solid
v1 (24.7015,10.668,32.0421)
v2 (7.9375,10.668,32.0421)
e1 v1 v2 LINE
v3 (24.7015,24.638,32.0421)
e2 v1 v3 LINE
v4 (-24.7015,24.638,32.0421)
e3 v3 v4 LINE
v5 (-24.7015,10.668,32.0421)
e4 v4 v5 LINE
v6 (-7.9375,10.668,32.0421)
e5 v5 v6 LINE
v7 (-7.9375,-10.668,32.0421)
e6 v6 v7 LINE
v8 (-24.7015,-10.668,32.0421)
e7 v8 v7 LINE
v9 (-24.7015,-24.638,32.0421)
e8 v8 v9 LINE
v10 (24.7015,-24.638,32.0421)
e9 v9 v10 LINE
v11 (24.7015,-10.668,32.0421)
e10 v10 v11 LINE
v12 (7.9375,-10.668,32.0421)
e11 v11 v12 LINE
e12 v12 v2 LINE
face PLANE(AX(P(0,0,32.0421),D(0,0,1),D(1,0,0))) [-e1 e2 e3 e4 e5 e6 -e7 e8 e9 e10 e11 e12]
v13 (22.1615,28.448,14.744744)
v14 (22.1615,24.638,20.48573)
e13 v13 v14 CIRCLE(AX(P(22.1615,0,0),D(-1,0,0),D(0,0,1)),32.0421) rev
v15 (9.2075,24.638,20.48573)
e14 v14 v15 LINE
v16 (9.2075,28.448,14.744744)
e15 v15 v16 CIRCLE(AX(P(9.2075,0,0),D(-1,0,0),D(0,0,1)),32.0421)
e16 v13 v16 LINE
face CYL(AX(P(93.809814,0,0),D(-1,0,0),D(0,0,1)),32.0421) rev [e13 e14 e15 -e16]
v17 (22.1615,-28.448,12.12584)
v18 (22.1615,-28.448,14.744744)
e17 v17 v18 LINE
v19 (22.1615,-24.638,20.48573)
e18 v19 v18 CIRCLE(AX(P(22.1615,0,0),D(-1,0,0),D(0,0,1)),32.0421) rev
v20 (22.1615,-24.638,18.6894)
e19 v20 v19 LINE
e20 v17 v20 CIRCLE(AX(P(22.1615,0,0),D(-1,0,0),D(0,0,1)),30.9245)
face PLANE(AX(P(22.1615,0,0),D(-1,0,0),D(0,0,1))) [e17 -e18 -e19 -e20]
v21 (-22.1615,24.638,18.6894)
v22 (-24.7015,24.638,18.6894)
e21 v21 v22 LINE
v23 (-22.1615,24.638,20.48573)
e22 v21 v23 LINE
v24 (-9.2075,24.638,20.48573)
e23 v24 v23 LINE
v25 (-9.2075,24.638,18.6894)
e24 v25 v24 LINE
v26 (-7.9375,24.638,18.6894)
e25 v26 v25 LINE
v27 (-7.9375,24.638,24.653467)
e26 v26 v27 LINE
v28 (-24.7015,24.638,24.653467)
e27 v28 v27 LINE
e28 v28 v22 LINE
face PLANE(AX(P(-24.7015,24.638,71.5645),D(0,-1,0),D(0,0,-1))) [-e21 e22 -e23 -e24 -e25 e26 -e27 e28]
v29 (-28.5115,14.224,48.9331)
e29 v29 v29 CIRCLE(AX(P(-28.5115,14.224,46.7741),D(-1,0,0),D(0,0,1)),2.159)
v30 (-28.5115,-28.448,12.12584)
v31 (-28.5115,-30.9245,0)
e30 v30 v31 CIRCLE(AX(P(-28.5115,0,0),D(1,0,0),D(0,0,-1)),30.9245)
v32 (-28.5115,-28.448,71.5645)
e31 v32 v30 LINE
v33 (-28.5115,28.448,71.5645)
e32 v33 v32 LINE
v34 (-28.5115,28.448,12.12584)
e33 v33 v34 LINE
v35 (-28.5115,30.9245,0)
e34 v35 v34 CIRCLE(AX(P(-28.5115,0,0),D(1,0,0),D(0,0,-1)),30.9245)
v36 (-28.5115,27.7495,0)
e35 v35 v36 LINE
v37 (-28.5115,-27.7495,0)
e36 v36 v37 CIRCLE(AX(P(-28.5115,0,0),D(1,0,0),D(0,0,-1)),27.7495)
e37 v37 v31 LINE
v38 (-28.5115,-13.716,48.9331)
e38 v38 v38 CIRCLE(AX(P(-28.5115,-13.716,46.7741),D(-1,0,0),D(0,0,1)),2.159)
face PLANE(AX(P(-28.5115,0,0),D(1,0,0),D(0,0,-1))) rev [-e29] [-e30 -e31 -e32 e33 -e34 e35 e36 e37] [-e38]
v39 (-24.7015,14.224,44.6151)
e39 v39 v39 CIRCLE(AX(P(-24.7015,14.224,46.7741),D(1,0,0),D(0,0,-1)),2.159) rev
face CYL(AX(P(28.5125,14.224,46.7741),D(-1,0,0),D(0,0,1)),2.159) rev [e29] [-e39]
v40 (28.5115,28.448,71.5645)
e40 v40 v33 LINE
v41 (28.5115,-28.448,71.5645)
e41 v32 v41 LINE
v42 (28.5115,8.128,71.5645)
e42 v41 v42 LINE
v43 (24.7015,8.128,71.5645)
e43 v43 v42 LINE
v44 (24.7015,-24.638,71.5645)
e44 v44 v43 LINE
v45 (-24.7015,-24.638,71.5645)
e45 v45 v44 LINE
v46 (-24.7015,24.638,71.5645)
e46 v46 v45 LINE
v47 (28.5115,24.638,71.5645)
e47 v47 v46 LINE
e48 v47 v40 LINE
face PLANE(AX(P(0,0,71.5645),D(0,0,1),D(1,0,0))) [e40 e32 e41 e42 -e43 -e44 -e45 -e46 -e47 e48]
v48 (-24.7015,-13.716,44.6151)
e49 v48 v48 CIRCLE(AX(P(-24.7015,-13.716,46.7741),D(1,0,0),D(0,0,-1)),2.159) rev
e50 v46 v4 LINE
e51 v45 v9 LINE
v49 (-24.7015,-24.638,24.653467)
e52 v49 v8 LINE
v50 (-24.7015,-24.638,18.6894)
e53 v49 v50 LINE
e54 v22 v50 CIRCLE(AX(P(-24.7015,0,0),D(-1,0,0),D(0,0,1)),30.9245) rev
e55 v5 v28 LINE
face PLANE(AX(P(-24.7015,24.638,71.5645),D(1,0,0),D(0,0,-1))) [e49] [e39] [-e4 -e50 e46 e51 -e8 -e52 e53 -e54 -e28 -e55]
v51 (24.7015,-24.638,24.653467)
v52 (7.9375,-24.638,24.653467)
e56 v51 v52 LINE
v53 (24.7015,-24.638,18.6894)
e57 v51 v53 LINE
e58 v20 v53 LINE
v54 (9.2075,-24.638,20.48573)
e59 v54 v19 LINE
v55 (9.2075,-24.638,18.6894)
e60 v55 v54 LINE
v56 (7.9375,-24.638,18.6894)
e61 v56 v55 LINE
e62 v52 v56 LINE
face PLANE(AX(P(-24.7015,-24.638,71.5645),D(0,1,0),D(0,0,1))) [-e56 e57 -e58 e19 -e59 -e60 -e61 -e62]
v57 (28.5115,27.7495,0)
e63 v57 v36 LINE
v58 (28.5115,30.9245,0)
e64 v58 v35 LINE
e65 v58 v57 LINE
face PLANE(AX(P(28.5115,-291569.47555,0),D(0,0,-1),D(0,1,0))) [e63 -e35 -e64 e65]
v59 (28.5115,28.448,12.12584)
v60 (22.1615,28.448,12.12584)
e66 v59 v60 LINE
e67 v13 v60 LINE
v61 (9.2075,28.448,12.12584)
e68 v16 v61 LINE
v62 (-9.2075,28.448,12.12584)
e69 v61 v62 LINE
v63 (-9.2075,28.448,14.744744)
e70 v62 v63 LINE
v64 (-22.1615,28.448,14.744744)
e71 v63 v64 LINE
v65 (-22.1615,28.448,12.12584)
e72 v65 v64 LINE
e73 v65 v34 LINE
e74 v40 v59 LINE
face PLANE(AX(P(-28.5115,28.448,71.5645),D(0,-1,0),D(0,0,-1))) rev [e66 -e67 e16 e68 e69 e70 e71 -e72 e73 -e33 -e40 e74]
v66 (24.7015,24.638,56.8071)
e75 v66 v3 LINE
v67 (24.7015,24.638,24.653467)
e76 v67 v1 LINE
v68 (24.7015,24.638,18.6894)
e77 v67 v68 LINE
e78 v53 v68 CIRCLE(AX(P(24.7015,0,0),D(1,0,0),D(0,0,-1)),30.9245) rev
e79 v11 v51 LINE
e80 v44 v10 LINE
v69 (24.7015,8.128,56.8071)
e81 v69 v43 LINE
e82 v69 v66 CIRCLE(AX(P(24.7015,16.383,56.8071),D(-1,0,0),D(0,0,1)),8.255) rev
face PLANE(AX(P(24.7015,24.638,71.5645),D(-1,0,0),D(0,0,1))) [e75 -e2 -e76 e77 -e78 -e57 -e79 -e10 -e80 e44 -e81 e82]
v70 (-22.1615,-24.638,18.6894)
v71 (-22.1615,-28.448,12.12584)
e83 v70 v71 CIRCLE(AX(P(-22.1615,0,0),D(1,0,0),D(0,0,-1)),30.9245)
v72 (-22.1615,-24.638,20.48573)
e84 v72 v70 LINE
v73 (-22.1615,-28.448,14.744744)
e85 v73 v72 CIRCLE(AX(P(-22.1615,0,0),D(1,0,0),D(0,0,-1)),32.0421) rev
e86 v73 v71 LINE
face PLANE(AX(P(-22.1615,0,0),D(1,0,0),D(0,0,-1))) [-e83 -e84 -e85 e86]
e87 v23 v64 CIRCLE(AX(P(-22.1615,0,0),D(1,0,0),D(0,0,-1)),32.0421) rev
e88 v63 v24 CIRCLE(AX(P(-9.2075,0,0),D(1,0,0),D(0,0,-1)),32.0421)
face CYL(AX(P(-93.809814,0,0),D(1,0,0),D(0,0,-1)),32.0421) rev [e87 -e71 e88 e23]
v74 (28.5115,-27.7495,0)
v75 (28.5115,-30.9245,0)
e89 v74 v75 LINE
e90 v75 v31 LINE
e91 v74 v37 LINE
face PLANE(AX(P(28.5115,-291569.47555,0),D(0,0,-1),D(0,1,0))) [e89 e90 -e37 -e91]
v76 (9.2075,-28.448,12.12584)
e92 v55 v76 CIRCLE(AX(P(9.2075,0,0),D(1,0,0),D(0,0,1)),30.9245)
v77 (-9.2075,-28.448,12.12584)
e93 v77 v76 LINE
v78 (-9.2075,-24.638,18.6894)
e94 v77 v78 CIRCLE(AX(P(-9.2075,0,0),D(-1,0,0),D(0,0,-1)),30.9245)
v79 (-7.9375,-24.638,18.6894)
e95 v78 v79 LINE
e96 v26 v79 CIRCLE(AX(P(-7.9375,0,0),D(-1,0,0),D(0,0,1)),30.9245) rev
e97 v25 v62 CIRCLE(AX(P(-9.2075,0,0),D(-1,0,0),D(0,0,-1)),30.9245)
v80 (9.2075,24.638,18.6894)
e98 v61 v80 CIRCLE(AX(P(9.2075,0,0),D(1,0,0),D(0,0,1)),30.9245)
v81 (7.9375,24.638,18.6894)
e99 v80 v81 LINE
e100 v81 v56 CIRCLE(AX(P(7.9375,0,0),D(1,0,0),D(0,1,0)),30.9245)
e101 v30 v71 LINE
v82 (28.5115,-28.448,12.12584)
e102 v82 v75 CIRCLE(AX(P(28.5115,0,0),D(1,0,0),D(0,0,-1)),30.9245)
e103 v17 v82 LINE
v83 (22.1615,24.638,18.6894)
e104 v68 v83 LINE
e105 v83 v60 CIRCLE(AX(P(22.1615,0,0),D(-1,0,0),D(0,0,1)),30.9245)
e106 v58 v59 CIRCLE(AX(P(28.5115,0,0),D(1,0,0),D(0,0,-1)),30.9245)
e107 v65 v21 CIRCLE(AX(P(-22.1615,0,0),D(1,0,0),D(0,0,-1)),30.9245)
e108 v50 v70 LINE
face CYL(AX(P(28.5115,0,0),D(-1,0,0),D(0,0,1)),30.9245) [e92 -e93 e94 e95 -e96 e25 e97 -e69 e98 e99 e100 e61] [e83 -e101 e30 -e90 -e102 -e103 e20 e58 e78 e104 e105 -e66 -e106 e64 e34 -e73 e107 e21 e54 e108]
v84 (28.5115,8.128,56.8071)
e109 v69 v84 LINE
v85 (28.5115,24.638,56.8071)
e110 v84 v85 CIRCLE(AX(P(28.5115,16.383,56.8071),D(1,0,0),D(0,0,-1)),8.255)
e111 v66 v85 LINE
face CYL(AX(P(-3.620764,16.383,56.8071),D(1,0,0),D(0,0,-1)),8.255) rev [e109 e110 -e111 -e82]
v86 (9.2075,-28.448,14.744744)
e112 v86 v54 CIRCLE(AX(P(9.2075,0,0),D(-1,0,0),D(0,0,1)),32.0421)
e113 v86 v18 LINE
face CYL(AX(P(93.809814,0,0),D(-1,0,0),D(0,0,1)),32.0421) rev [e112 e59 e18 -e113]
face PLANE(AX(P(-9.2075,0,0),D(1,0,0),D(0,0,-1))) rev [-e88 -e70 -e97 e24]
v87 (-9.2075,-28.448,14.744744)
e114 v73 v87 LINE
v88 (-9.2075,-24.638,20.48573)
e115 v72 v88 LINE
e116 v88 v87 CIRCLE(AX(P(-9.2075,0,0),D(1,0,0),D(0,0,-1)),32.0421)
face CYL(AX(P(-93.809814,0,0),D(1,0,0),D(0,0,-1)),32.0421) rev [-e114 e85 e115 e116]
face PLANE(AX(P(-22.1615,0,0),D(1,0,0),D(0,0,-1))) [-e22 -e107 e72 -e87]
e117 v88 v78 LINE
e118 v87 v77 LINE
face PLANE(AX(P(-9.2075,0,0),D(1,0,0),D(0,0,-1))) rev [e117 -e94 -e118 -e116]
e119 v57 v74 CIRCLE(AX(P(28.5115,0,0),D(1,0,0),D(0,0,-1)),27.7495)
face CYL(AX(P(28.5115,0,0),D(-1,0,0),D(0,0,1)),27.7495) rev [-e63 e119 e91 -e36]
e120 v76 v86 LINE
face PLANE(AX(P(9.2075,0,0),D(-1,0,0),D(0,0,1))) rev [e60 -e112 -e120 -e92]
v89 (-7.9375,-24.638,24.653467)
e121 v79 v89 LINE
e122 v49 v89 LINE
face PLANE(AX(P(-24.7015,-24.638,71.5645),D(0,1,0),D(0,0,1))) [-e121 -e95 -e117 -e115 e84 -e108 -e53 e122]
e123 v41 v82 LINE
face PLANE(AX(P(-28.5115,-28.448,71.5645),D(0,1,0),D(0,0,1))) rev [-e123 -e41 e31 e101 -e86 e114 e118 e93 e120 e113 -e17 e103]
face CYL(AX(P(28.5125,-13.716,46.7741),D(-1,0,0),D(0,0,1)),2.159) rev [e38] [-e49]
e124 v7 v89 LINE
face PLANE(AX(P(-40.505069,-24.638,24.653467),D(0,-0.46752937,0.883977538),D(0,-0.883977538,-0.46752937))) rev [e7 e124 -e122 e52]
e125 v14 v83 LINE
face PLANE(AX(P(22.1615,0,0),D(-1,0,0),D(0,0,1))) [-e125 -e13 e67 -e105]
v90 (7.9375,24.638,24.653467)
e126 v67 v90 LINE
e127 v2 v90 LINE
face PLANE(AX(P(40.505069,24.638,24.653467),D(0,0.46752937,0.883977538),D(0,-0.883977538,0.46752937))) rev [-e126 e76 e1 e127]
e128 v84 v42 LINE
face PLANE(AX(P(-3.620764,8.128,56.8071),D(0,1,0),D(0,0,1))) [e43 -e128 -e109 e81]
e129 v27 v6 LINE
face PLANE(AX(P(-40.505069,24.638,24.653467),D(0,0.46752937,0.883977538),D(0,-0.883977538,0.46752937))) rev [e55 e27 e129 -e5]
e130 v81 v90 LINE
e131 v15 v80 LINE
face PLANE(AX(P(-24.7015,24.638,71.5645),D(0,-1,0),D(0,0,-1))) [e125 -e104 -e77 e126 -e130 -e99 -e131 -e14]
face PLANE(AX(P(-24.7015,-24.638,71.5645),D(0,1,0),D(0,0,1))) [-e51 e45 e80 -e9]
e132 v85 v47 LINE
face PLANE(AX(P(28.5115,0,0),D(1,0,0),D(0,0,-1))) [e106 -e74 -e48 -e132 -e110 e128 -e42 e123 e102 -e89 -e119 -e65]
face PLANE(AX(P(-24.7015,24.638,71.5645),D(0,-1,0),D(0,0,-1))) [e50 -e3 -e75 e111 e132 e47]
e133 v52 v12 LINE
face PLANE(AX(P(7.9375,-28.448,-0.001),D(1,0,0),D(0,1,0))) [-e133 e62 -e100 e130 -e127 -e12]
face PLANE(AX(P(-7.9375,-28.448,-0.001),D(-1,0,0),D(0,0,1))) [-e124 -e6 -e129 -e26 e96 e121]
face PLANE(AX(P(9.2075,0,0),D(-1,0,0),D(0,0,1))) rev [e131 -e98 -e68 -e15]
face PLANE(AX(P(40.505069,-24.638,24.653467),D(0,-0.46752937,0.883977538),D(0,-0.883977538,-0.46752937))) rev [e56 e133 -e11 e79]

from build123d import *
from build123d.topology import SkipClean

# Parameters (mm, degrees)
BOSS_EXTRUDE1_DEPTH                  = 28.5115
SKETCH5_W                            = 57.023
SKETCH5_H                            = 56.896
SKETCH5_W_2                          = 49.403
SKETCH5_H_2                          = 49.276
BOSS_EXTRUDE2_DEPTH                  = 40.64
BOSS_EXTRUDE2_DIRECTION_2_REACH      = 54.207
BOSS_EXTRUDE2_DIRECTION_2_END_RADIUS = 30.9245
CUT_EXTRUDE1_START                   = -12.954
CUT_EXTRUDE1_DEPTH                   = 12.954
CUT_EXTRUDE2_START                   = -12.954
CUT_EXTRUDE2_DEPTH                   = 12.954
CUT_EXTRUDE3_DEPTH                   = 3.81
BOSS_EXTRUDE3_REACH                  = 59.717
BOSS_EXTRUDE3_END_RADIUS             = 30.9245
SKETCH11_W                           = 15.875
SKETCH11_H                           = 53.086
BOSS_EXTRUDE5_DEPTH                  = 16.764
BOSS_EXTRUDE6_DEPTH                  = 16.764
CUT_EXTRUDE4_START                   = -3.81
CUT_EXTRUDE4_OUTLINE_R               = 2.159
CUT_EXTRUDE4_DEPTH                   = 3.81


# Read off the part's stored shape, not the designer's step: Cut-Extrude4
with BuildPart() as part:
    # Sketch2 → Boss-Extrude1 (new, symmetric)
    with BuildSketch(Plane(origin=(0, 0, 0), x_dir=(0, 0, -1), z_dir=(1, 0, 0))):
        with BuildLine():
            Line((0, -30.9245), (0, -27.7495))
            ThreePointArc((0, -27.7495), (-27.7495, 0), (0, 27.7495))
            Line((0, 27.7495), (0, 30.9245))
            ThreePointArc((0, 30.9245), (-30.9245, 0), (0, -30.9245))
        make_face()
    extrude(amount=BOSS_EXTRUDE1_DEPTH, both=True)

    # Sketch5 → Boss-Extrude2 (add)
    with BuildSketch(Plane.XY.offset(30.9245)):
        Rectangle(SKETCH5_W, SKETCH5_H)
        Rectangle(SKETCH5_W_2, SKETCH5_H_2, mode=Mode.SUBTRACT)
    extrude(amount=BOSS_EXTRUDE2_DEPTH)

    # Boss-Extrude2 direction 2: up to this cylinder (the profile starts outside it)
    boss_extrude2_direction_2_end = Plane(origin=(0, 0, 0), z_dir=(-1, 0, 0)) * Cylinder(BOSS_EXTRUDE2_DIRECTION_2_END_RADIUS, 171.263, mode=Mode.PRIVATE)
    # Sketch5 → Boss-Extrude2 direction 2 (add, up to the surface)
    with BuildSketch(Plane.XY.offset(30.9245), mode=Mode.PRIVATE) as boss_extrude2_direction_2_sk1:
        Rectangle(SKETCH5_W, SKETCH5_H)
        Rectangle(SKETCH5_W_2, SKETCH5_H_2, mode=Mode.SUBTRACT)
    boss_extrude2_direction_2_tool1 = extrude(boss_extrude2_direction_2_sk1.sketch, amount=-BOSS_EXTRUDE2_DIRECTION_2_REACH, mode=Mode.PRIVATE) - boss_extrude2_direction_2_end
    add(boss_extrude2_direction_2_tool1.solids().sort_by_distance((0, 27.642471, 30.9245))[0])
    add(boss_extrude2_direction_2_tool1.solids().sort_by_distance((0, 27.642471, 30.9245))[1])

    # Sketch7 → Cut-Extrude1 (cut)
    with SkipClean():  # the faces are left unmerged after this step: merging them gives an invalid solid
        with BuildSketch(Plane.ZY.offset(-9.2075).offset(CUT_EXTRUDE1_START)):
            with BuildLine():
                Line((0, 30.9245), (0, 32.0421))
                ThreePointArc((0, 32.0421), (32.0421, 0), (0, -32.0421))
                Line((0, -32.0421), (0, -30.9245))
                ThreePointArc((0, -30.9245), (30.9245, 0), (0, 30.9245))
            make_face()
        extrude(amount=CUT_EXTRUDE1_DEPTH, mode=Mode.SUBTRACT)

    # Sketch8 → Cut-Extrude2 (cut)
    with SkipClean():  # the faces are left unmerged after this step: merging them gives an invalid solid
        with BuildSketch(Plane(origin=(-9.2075, 0, 0), x_dir=(0, 0, -1), z_dir=(1, 0, 0)).offset(CUT_EXTRUDE2_START)):
            with BuildLine():
                Line((0, 30.9245), (0, 32.0421))
                ThreePointArc((0, 32.0421), (-32.0421, 0), (0, -32.0421))
                Line((0, -32.0421), (0, -30.9245))
                ThreePointArc((0, -30.9245), (-30.9245, 0), (0, 30.9245))
            make_face()
        extrude(amount=CUT_EXTRUDE2_DEPTH, mode=Mode.SUBTRACT)

    # Sketch10 → Cut-Extrude3 (cut)
    with SkipClean():  # the faces are left unmerged after this step: merging them gives an invalid solid
        with BuildSketch(Plane(origin=(28.5115, 0, 0), x_dir=(0, 0, -1), z_dir=(1, 0, 0))):
            with BuildLine():
                Line((-56.8071, 24.638), (-71.5645, 24.638))
                Line((-71.5645, 24.638), (-71.5645, 8.128))
                Line((-71.5645, 8.128), (-56.8071, 8.128))
                ThreePointArc((-56.8071, 8.128), (-48.5521, 16.383), (-56.8071, 24.638))
            make_face()
        extrude(amount=-CUT_EXTRUDE3_DEPTH, mode=Mode.SUBTRACT)

    # Boss-Extrude3: up to this cylinder (the profile starts outside it)
    with SkipClean():  # the faces are left unmerged after this step: merging them gives an invalid solid
        boss_extrude3_end = Plane(origin=(0, 0, 0), z_dir=(-1, 0, 0)) * Cylinder(BOSS_EXTRUDE3_END_RADIUS, 182.283, mode=Mode.PRIVATE)
        # Sketch11 → Boss-Extrude3 (add, up to the surface)
        with BuildSketch(Plane.XY.offset(32.0421), mode=Mode.PRIVATE) as boss_extrude3_sk1:
            with Locations((0, -1.905)):
                Rectangle(SKETCH11_W, SKETCH11_H)
        boss_extrude3_tool1 = extrude(boss_extrude3_sk1.sketch, amount=-BOSS_EXTRUDE3_REACH, mode=Mode.PRIVATE) - boss_extrude3_end
        add(boss_extrude3_tool1.solids().sort_by_distance((0, -1.905, 32.0421))[0])

    # Sketch15 → Boss-Extrude5 (add)
    with SkipClean():  # the faces are left unmerged after this step: merging them gives an invalid solid
        with BuildSketch(Plane.ZY.offset(7.9375)):
            Polygon((32.0421, -24.638), (24.653467357, -24.638), (32.0421, -10.668), align=None)
            Polygon((24.653467357, 24.638), (32.0421, 10.668), (32.0421, 24.638), align=None)
        extrude(amount=BOSS_EXTRUDE5_DEPTH)

    # Sketch16 → Boss-Extrude6 (add)
    with SkipClean():  # the faces are left unmerged after this step: merging them gives an invalid solid
        with BuildSketch(Plane(origin=(7.9375, 0, 0), x_dir=(0, 0, -1), z_dir=(1, 0, 0))):
            Polygon((-32.0421, -24.638), (-24.653467357, -24.638), (-32.0421, -10.668), align=None)
            Polygon((-24.653467357, 24.638), (-32.0421, 10.668), (-32.0421, 24.638), align=None)
        extrude(amount=BOSS_EXTRUDE6_DEPTH)

    # Cut-Extrude4 outline → Cut-Extrude4 (cut)
    with SkipClean():  # the faces are left unmerged after this step: merging them gives an invalid solid
        with BuildSketch(Plane.ZY.offset(28.5115).offset(CUT_EXTRUDE4_START)):
            with Locations((46.7741, -13.716)):
                Circle(CUT_EXTRUDE4_OUTLINE_R)
            with Locations((46.7741, 14.224)):
                Circle(CUT_EXTRUDE4_OUTLINE_R)
        extrude(amount=CUT_EXTRUDE4_DEPTH, mode=Mode.SUBTRACT)


solid = part.part
